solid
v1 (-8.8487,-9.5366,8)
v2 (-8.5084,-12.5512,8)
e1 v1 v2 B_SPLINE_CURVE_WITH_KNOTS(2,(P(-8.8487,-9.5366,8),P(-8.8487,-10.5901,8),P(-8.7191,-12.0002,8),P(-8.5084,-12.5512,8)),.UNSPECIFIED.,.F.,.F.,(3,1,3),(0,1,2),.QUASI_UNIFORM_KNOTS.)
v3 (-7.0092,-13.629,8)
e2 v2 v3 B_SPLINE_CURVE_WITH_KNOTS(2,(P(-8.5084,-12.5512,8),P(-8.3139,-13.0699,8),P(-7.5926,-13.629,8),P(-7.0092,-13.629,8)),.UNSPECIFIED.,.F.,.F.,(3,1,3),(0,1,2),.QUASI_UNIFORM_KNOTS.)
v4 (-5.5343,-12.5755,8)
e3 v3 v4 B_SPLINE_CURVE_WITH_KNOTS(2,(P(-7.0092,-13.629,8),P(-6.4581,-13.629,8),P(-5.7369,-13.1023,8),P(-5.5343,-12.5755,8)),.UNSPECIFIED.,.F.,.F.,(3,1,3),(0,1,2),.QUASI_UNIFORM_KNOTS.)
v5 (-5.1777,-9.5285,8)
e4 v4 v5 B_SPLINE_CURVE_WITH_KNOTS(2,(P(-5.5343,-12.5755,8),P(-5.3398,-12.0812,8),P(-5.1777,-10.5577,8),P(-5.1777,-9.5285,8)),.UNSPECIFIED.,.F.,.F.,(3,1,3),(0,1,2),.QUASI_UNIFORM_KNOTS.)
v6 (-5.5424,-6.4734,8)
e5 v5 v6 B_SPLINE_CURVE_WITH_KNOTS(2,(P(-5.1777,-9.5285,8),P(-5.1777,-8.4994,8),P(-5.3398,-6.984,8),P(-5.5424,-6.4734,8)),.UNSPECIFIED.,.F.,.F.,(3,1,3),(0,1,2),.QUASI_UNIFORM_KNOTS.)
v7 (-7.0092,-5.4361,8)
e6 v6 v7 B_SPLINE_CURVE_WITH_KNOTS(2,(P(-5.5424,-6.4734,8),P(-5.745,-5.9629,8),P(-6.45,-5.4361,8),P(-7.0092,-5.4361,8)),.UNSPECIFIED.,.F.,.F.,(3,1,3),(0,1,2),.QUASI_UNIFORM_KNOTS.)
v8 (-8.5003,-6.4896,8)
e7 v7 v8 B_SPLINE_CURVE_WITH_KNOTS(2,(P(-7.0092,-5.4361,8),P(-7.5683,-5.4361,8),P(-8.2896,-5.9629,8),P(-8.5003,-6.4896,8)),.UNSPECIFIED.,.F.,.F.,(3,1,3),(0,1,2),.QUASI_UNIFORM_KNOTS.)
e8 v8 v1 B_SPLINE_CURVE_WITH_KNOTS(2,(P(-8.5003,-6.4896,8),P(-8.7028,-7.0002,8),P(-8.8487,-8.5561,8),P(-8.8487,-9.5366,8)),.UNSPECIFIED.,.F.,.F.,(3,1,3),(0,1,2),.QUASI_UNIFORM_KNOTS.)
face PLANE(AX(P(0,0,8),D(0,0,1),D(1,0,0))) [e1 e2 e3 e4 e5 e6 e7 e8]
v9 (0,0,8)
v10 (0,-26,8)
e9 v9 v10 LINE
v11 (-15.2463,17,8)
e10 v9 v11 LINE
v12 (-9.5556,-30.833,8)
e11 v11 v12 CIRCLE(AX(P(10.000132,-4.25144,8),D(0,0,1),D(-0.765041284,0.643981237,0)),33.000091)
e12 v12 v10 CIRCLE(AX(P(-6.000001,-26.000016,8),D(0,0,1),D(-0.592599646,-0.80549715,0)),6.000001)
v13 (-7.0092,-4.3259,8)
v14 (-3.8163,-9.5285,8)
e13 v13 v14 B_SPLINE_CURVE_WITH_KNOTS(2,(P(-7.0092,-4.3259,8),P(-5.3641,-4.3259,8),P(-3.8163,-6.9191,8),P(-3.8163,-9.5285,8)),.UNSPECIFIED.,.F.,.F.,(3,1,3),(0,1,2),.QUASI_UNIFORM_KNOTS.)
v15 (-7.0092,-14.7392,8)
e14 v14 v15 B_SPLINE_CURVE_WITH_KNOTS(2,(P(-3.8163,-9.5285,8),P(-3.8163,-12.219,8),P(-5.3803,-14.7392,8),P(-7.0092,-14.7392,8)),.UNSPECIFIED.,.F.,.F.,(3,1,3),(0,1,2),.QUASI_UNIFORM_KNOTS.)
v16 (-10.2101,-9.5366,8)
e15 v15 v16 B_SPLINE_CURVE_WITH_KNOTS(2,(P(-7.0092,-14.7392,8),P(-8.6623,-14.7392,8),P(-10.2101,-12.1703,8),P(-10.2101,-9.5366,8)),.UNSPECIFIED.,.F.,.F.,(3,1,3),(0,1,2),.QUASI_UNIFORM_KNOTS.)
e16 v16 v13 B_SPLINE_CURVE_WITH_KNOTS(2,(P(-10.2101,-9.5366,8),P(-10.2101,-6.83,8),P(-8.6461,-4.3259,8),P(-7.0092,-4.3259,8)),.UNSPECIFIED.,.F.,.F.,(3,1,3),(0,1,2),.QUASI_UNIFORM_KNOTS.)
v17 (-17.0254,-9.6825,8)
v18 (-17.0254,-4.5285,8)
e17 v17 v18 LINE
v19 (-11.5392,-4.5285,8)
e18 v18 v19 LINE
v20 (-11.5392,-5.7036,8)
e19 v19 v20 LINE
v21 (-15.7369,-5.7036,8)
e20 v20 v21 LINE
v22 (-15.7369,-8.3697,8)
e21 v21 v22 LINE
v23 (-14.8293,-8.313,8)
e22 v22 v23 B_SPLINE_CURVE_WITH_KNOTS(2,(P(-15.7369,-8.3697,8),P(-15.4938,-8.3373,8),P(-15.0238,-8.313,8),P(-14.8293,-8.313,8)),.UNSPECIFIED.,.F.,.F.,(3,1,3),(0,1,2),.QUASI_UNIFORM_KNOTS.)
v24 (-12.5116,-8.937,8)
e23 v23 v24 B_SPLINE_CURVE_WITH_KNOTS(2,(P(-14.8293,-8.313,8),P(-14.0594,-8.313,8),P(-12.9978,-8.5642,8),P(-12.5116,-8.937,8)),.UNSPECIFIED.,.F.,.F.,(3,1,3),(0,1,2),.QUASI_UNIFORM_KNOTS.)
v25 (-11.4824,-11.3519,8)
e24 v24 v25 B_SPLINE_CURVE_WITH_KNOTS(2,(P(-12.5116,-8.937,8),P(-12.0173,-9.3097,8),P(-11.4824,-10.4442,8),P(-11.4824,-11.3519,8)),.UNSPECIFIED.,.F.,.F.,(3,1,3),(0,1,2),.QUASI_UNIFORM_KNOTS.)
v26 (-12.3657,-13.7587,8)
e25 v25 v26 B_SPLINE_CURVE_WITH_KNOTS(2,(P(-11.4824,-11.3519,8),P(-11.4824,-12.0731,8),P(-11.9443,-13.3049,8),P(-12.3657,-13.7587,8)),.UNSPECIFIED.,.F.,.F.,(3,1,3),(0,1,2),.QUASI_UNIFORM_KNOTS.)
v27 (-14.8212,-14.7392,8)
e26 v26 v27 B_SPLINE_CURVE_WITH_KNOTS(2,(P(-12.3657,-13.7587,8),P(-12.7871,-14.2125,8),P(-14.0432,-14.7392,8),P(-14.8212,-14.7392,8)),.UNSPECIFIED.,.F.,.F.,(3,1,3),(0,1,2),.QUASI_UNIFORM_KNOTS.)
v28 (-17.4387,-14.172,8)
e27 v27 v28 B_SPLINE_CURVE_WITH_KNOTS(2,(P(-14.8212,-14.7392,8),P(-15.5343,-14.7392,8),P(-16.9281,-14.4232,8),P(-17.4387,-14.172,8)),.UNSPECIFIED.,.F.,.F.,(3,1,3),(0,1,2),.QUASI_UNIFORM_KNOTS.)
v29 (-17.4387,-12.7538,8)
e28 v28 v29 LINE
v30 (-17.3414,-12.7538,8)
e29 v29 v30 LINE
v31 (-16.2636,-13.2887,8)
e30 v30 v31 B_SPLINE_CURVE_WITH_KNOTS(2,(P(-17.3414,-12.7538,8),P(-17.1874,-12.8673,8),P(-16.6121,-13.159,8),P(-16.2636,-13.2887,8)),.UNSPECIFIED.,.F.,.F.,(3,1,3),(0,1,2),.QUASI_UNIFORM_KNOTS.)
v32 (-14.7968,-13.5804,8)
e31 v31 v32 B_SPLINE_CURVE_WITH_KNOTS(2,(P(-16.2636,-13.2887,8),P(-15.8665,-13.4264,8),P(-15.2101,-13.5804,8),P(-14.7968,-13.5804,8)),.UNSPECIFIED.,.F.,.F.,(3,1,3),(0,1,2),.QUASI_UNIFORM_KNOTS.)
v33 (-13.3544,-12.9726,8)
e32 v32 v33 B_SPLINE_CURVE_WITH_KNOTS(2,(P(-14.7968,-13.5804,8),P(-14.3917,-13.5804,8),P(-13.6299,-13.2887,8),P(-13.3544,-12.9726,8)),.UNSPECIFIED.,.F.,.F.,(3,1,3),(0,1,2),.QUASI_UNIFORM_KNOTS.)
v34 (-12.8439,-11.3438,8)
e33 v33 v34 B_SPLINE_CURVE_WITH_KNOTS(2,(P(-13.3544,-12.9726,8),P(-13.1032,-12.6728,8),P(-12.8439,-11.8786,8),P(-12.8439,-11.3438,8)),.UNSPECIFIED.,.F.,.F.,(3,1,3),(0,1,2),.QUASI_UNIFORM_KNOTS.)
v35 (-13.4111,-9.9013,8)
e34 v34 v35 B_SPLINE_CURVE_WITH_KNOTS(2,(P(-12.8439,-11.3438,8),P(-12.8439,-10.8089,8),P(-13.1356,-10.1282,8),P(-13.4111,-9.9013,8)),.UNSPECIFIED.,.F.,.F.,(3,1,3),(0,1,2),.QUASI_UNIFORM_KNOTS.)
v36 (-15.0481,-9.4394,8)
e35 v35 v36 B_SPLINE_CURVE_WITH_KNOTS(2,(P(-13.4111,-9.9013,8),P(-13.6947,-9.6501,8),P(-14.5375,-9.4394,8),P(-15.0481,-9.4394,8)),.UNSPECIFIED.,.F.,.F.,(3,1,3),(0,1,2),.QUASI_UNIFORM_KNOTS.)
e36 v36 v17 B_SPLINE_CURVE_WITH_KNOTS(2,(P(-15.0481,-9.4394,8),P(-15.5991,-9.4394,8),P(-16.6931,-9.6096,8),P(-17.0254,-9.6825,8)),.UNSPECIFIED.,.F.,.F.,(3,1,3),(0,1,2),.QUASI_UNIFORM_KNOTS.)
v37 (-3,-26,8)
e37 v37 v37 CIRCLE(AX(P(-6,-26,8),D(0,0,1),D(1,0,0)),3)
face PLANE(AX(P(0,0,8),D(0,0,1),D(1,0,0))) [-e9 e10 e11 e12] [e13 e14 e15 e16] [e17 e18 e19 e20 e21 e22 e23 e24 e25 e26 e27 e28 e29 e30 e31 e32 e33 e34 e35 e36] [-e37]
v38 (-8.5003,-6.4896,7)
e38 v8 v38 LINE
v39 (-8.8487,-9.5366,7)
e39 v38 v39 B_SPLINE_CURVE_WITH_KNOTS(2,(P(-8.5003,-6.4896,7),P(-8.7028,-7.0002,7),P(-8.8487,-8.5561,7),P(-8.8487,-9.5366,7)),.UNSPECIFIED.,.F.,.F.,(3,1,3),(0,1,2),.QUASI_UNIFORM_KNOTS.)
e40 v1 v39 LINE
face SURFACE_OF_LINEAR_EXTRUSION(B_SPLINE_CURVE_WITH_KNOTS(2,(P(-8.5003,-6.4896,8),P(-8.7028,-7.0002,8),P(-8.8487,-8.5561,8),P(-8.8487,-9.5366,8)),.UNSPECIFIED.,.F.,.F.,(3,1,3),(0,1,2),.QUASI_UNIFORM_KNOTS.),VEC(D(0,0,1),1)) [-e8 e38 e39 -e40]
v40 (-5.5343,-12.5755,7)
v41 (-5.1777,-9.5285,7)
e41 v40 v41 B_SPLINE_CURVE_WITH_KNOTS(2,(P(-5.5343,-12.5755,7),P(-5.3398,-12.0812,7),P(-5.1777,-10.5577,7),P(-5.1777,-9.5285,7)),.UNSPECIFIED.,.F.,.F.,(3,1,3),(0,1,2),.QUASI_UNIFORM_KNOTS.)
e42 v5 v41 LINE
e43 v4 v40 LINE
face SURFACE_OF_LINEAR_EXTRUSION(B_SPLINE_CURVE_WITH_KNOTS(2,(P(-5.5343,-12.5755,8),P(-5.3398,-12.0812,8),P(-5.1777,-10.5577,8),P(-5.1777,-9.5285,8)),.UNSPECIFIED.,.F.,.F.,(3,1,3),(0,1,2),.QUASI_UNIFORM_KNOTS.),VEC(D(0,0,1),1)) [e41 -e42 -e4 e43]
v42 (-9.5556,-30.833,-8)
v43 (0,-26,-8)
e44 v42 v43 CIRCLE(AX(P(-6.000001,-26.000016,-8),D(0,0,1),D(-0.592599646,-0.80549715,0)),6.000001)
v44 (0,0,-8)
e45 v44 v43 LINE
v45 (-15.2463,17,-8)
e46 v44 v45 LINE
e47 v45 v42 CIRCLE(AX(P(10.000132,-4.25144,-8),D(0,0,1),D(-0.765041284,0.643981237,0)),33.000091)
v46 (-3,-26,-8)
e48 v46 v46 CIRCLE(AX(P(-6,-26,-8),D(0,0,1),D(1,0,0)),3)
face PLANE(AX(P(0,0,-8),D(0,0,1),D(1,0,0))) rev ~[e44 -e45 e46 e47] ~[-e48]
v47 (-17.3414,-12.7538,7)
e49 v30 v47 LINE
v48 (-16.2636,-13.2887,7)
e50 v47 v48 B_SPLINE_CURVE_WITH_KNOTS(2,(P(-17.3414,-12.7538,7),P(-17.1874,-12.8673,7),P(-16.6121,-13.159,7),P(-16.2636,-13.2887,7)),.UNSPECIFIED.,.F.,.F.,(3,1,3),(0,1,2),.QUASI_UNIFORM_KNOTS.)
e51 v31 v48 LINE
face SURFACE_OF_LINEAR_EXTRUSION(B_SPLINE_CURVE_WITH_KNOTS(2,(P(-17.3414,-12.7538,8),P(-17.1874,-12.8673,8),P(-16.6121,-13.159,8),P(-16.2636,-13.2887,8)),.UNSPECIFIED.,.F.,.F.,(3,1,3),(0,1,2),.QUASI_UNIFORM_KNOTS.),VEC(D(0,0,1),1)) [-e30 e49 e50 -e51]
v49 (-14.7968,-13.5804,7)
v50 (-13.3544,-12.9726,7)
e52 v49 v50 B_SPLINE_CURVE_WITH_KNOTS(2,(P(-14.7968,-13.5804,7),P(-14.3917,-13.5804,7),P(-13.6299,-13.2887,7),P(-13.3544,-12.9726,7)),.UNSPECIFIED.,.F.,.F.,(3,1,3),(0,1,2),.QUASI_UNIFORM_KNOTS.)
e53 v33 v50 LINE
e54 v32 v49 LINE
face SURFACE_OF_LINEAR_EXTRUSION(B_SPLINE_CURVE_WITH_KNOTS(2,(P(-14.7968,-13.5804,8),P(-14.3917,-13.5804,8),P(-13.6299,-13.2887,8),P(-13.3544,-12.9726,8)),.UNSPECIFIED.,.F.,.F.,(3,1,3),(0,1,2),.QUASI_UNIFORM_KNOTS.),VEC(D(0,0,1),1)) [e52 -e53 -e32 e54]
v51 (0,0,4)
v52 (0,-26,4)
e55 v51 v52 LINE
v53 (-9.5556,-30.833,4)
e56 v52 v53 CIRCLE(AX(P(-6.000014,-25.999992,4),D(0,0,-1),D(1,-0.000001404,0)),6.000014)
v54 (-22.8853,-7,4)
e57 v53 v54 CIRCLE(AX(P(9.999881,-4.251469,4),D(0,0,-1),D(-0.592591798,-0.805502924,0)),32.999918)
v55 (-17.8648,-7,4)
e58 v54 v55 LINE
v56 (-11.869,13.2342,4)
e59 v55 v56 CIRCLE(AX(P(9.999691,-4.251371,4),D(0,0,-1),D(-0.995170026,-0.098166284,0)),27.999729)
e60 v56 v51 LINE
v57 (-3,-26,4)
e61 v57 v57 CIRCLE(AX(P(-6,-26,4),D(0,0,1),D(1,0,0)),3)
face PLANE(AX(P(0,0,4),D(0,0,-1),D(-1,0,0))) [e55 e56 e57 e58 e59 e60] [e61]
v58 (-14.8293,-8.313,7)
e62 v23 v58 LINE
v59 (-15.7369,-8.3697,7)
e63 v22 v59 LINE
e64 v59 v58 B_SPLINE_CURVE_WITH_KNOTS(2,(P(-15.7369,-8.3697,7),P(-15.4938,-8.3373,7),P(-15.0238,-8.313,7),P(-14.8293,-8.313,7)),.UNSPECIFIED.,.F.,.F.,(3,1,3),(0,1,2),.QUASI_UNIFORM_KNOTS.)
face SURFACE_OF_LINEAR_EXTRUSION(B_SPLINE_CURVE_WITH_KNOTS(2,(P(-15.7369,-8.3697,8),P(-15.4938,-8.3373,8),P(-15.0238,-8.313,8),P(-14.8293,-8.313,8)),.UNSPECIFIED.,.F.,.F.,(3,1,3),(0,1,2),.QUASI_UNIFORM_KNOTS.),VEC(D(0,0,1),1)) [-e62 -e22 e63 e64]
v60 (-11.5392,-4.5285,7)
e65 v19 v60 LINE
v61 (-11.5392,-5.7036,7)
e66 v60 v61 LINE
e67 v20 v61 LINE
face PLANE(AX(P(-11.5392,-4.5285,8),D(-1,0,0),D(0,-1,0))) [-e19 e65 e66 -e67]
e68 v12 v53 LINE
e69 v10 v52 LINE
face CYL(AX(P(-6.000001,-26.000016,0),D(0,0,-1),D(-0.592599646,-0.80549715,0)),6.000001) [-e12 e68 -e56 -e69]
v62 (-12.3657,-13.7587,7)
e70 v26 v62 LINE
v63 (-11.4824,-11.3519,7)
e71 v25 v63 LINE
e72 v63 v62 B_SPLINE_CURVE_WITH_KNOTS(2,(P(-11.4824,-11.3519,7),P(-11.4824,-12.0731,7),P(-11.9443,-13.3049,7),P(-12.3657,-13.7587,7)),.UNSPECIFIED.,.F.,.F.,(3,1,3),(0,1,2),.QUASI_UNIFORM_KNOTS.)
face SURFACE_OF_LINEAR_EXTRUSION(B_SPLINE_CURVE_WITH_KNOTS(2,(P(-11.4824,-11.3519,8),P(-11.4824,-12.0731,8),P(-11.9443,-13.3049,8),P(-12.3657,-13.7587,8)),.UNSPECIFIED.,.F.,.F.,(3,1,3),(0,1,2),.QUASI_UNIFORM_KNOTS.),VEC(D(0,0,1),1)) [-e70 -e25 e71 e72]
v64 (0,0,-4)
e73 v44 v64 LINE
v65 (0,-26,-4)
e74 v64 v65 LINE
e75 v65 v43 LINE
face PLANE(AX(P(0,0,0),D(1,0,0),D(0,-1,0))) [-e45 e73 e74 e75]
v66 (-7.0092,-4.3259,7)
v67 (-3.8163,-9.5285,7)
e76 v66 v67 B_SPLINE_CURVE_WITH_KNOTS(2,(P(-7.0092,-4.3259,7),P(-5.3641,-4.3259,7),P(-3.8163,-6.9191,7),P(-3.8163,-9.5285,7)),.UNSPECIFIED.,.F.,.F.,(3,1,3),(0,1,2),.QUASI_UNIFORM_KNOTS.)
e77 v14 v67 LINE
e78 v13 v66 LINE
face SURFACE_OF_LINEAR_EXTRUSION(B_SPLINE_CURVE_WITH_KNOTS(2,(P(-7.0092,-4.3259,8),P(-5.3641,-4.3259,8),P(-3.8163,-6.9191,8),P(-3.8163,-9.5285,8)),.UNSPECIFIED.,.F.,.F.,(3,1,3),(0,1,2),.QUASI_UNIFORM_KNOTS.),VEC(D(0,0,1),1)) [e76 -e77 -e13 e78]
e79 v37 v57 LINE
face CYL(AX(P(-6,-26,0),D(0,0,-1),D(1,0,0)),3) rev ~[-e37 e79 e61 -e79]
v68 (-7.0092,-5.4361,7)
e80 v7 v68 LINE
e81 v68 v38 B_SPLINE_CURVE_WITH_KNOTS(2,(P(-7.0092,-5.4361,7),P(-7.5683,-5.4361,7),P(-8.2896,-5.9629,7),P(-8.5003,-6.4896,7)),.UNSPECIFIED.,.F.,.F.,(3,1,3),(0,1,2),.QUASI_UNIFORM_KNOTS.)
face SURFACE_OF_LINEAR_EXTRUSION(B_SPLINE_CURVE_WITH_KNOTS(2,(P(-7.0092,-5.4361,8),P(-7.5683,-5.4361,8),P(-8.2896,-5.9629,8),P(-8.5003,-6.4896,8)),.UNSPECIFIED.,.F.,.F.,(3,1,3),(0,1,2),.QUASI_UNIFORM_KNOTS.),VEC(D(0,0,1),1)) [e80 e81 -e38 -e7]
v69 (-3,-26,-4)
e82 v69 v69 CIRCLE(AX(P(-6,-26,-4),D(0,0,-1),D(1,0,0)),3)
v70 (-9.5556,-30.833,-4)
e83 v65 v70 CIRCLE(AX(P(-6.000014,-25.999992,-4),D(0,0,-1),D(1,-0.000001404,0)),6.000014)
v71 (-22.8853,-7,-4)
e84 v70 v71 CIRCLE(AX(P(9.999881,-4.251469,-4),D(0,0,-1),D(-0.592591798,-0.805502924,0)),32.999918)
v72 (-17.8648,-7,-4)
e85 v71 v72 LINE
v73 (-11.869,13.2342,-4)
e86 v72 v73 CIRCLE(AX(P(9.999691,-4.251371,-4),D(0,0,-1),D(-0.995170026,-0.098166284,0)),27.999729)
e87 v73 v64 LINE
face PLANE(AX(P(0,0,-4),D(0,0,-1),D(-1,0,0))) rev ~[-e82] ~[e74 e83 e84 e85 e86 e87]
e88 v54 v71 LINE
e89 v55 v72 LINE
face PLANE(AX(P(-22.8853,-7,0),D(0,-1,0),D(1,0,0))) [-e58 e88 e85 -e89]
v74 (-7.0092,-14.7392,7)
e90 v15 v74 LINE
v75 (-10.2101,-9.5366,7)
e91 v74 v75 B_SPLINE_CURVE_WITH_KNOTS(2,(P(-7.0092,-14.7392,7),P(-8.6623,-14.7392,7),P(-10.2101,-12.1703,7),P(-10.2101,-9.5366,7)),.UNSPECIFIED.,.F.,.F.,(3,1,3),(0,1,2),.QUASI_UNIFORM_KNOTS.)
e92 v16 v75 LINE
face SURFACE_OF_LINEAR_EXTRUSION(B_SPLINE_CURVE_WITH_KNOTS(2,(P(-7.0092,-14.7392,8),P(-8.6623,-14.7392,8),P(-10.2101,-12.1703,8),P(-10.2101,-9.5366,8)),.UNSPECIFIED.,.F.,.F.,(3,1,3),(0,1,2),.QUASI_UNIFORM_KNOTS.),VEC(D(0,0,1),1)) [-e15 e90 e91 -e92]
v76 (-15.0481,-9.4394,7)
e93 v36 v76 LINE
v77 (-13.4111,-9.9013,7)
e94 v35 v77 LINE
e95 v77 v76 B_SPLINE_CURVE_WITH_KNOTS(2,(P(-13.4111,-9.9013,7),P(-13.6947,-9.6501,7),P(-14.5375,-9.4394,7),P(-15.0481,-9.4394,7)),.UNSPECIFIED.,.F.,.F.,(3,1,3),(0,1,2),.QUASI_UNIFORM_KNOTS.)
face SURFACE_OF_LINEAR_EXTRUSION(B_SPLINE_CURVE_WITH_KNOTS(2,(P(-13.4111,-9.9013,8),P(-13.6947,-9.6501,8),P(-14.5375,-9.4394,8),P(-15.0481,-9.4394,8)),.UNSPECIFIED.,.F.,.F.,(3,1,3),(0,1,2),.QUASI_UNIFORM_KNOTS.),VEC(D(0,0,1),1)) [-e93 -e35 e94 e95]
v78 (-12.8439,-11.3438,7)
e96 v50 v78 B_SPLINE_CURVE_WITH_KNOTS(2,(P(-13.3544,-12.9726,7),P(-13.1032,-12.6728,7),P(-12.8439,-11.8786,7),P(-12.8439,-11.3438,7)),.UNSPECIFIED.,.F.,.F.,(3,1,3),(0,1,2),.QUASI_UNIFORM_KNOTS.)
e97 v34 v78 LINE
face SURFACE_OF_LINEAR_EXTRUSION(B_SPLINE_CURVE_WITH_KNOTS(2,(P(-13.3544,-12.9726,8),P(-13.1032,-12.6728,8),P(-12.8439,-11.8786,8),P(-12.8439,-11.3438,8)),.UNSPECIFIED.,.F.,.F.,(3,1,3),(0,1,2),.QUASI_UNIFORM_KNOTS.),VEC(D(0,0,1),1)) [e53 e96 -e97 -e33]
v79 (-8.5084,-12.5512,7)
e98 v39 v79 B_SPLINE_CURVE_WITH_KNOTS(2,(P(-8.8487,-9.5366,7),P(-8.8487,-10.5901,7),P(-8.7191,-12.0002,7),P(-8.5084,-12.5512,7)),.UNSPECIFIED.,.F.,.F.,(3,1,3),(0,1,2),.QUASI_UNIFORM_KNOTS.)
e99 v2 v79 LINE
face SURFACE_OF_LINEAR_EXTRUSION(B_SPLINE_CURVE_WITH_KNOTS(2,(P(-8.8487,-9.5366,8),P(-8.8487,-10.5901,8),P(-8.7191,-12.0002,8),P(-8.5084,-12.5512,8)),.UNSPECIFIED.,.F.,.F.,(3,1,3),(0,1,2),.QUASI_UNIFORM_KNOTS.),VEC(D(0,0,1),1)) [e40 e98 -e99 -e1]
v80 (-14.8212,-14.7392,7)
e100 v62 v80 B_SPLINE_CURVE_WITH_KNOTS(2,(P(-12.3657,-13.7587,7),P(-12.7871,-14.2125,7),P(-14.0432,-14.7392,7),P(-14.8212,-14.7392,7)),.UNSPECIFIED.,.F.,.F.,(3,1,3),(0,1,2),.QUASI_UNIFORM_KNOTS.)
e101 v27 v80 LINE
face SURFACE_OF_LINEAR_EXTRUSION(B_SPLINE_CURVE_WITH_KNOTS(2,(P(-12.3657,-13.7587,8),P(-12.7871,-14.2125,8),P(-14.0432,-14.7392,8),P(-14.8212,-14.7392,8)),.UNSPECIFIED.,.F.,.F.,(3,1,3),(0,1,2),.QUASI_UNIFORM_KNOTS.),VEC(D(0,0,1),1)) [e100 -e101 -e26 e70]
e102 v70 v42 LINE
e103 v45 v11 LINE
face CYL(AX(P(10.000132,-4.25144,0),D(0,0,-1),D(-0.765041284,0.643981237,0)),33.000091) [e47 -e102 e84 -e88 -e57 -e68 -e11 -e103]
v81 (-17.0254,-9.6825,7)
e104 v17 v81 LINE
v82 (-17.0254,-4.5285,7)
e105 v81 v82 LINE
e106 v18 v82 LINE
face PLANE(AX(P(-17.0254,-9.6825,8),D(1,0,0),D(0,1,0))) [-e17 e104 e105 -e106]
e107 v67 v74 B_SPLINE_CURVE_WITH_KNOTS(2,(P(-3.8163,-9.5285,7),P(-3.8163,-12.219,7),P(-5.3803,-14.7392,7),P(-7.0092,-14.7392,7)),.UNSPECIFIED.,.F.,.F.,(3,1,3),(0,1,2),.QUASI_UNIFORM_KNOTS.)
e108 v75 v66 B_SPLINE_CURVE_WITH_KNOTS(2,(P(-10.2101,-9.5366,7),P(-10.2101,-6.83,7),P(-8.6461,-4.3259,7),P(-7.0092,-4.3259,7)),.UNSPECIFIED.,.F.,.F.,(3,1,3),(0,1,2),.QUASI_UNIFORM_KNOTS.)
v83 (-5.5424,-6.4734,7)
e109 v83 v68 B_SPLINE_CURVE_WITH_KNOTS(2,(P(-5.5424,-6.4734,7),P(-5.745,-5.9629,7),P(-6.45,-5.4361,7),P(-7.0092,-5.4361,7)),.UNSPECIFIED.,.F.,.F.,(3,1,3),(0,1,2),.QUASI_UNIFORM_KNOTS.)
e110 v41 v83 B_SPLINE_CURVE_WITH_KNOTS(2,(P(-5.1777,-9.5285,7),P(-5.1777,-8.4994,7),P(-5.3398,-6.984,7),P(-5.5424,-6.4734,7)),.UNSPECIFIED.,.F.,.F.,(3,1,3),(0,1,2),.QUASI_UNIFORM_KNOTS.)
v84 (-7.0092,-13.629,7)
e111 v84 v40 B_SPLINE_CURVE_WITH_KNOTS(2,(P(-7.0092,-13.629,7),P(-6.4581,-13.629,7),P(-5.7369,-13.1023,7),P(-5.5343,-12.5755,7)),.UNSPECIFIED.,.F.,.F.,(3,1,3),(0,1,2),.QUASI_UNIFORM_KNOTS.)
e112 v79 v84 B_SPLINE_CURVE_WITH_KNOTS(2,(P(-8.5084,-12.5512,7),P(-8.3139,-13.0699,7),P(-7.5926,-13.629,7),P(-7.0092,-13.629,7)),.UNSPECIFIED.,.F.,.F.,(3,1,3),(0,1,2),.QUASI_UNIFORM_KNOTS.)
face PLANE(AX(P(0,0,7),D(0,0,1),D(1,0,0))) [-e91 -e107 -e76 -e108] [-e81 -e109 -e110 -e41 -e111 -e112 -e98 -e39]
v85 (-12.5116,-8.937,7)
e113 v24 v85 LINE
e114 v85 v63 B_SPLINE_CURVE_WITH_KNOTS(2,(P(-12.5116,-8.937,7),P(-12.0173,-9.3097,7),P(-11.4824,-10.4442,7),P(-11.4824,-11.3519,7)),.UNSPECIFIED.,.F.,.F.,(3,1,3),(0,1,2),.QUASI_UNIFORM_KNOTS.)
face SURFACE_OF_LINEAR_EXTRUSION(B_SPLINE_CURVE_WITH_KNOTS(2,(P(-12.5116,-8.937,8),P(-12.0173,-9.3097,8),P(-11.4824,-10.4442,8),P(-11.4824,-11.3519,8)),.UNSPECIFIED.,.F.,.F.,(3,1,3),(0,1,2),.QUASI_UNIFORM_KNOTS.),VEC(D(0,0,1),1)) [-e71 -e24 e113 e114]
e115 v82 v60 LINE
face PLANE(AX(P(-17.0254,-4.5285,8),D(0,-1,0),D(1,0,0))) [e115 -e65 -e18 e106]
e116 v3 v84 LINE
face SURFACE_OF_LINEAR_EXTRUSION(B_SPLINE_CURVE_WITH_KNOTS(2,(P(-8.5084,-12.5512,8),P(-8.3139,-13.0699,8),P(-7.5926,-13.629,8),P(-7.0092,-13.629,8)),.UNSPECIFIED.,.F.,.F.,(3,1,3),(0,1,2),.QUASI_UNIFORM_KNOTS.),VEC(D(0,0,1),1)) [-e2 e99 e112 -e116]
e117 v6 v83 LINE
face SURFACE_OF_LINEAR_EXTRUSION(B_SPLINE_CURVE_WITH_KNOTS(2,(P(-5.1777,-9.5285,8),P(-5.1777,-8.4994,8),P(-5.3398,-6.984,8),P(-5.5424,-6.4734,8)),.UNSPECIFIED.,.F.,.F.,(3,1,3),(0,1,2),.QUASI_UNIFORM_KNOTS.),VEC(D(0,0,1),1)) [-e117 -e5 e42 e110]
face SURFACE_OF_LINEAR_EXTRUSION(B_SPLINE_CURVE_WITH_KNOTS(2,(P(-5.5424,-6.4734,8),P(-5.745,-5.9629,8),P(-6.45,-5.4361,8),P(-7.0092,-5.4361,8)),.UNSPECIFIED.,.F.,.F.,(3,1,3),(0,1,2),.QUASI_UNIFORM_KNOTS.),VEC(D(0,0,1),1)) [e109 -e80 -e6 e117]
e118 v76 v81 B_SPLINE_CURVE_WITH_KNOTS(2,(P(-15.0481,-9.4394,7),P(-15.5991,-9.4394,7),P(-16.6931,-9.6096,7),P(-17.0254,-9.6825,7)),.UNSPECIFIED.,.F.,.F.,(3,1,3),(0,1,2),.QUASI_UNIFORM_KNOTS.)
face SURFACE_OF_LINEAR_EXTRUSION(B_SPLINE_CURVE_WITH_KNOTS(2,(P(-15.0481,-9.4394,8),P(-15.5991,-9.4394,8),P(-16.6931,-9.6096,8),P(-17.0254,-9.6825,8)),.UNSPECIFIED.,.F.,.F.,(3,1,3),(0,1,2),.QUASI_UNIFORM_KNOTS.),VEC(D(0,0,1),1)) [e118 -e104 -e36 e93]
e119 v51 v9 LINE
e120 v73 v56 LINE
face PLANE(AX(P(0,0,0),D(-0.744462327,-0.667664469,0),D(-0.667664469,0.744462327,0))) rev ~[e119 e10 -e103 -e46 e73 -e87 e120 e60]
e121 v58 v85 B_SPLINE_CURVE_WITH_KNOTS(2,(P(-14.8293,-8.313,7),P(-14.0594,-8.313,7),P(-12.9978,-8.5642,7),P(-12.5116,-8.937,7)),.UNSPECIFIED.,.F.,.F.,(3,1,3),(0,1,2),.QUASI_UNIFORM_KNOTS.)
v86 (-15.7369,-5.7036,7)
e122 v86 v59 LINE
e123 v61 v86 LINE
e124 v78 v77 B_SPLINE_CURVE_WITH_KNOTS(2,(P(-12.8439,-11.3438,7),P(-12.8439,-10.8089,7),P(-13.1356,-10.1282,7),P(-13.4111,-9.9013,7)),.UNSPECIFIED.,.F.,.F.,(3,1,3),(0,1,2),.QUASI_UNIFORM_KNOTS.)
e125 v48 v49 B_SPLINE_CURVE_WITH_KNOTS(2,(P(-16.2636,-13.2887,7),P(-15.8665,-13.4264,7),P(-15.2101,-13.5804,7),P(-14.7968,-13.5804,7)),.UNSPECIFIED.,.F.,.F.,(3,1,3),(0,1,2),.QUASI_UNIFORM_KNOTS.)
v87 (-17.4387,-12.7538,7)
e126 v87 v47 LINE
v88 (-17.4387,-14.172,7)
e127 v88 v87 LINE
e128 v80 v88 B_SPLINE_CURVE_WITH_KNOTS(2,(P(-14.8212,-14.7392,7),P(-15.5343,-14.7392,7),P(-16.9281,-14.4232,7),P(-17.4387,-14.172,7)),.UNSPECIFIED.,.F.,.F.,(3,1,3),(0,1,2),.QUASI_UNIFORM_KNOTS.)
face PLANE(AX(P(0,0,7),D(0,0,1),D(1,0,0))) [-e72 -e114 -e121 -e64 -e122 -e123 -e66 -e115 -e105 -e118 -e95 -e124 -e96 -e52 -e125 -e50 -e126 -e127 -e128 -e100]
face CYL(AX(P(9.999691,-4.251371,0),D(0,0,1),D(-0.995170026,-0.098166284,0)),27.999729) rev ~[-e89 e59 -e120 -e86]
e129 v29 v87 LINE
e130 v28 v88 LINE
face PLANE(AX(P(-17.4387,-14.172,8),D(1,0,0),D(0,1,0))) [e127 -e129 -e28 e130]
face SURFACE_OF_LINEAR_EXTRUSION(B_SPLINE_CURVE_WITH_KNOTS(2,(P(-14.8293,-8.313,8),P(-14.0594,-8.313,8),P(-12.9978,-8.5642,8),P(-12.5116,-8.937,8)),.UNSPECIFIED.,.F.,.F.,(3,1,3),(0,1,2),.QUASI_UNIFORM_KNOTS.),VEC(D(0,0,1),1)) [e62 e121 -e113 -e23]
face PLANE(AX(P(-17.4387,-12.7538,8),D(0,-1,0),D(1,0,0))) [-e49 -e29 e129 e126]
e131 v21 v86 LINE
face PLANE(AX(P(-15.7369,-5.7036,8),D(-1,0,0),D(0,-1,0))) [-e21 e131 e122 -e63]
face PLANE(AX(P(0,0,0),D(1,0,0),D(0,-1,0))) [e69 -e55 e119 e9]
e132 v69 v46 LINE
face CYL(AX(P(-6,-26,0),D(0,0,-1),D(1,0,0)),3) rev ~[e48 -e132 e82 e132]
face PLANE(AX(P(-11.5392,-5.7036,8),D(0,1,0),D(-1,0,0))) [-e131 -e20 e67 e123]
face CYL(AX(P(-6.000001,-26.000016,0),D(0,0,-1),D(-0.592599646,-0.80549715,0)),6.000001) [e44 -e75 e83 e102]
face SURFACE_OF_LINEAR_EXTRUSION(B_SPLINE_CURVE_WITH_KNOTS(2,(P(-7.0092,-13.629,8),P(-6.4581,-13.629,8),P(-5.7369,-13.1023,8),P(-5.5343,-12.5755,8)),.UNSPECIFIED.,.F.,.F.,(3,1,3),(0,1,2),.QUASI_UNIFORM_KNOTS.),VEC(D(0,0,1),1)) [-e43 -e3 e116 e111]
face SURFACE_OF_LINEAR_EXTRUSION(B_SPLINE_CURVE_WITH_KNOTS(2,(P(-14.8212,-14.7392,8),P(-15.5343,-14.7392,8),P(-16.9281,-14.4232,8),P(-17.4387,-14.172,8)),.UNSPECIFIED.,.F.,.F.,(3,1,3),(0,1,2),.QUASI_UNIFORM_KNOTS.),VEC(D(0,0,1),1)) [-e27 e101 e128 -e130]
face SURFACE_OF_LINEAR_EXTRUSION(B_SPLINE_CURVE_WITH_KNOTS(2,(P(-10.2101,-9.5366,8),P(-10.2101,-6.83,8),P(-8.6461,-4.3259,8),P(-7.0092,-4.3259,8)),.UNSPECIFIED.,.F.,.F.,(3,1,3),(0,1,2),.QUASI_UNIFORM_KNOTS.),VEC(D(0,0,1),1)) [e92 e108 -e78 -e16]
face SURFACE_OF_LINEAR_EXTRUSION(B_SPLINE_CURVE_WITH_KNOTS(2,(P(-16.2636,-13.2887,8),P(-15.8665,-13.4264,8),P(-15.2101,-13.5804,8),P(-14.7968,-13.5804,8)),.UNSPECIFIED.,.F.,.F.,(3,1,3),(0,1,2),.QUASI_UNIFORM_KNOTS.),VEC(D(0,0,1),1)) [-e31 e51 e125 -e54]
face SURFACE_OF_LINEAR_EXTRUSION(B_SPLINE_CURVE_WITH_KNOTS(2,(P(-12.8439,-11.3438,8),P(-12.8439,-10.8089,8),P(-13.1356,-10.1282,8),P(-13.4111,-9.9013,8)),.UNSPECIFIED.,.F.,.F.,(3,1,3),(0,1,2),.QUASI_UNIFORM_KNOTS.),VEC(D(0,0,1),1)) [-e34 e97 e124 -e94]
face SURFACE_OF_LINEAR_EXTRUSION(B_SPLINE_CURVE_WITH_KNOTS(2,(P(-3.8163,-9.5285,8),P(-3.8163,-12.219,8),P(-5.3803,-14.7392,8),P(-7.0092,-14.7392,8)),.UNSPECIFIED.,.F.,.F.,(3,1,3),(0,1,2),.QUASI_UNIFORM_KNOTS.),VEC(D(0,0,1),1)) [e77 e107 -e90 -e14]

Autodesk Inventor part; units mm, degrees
ref_plane "YZ Plane" through (0, 0, 0) normal (1, 0, 0) x (0, 1, 0)
ref_plane "XZ Plane" through (0, 0, 0) normal (0, 1, 0) x (-1, 0, 0)
sketch "스케치1" plane through (0, 0, 0) normal (0, 0, 1) x (1, 0, 0)
  line L0 (0, 0) -> (0, -26)
  line L1 (0, 0) -> (26, 0) construction
  arc A0 (-9.5556, -30.833) -> (0, -26) centre (-6, -26) ccw
  line L2 (0, 0) -> (-15.2463, 17)
  arc A1 (-15.2463, 17) -> (-9.5556, -30.833) centre (10, -4.2514) ccw
  circle A2 centre (-6, -26) radius 3
  dimension "d1" = 26
  dimension "d3" = 26
  dimension "d5" = 43
  dimension "d6" = 23
  dimension "d7" = 33
  dimension "d8" = 6
  dimension "d9" = 6
extrude "돌출1" add sketch "스케치1" along normal mid plane 16
ref_plane "작업 평면1" through (0, 0, 0) normal (0, 0, -1) x (-1, 0, 0)
sketch "스케치2" plane through (0, 0, 0) normal (0, 0, -1) x (-1, 0, 0)
  arc A0 (9.5556, -30.833) -> (15.2463, 17) centre (-10, -4.2514) ccw projected
  line L0 (22.8853, -7) -> (17.8648, -7)
  line L1 (0, 0) -> (0, -26) projected
  circle A1 centre (6, -26) radius 3 projected
  arc A2 (17.8648, -7) -> (11.869, 13.2342) centre (-10, -4.2514) ccw
  line L2 (15.2463, 17) -> (0, 0) projected
  arc A3 (0, -26) -> (9.5556, -30.833) centre (6, -26) ccw projected
  dimension "d14" = 19
extrude "돌출2" cut sketch "스케치2" along normal mid plane 8 contours A3 L1 L2 A2 L0 A0
sketch "스케치6" plane through (0, 0, 8) normal (0, 0, 1) x (1, 0, 0)
  line L0 (-18.2733, -4.3259) -> (-3.2652, -4.3259) construction
  line L1 (-3.2652, -4.3259) -> (-3.2652, -14.7392) construction
  line L2 (-3.2652, -14.7392) -> (-18.2733, -14.7392) construction
  line L3 (-18.2733, -14.7392) -> (-18.2733, -4.3259) construction
  spline S0 degree 2 poles (-11.4824, -11.3519) (-11.4824, -12.0731) (-11.9443, -13.3049) (-12.3657, -13.7587) knots 0 0 0 1 2 2 2
  spline S1 degree 2 poles (-12.3657, -13.7587) (-12.7871, -14.2125) (-14.0432, -14.7392) (-14.8212, -14.7392) knots 0 0 0 1 2 2 2
  spline S2 degree 2 poles (-14.8212, -14.7392) (-15.5343, -14.7392) (-16.9281, -14.4232) (-17.4387, -14.172) knots 0 0 0 1 2 2 2
  line L4 (-17.4387, -14.172) -> (-17.4387, -12.7538)
  line L5 (-17.4387, -12.7538) -> (-17.3414, -12.7538)
  spline S3 degree 2 poles (-17.3414, -12.7538) (-17.1874, -12.8673) (-16.6121, -13.159) (-16.2636, -13.2887) knots 0 0 0 1 2 2 2
  spline S4 degree 2 poles (-16.2636, -13.2887) (-15.8665, -13.4264) (-15.2101, -13.5804) (-14.7968, -13.5804) knots 0 0 0 1 2 2 2
  spline S5 degree 2 poles (-14.7968, -13.5804) (-14.3917, -13.5804) (-13.6299, -13.2887) (-13.3544, -12.9726) knots 0 0 0 1 2 2 2
  spline S6 degree 2 poles (-13.3544, -12.9726) (-13.1032, -12.6728) (-12.8439, -11.8786) (-12.8439, -11.3438) knots 0 0 0 1 2 2 2
  spline S7 degree 2 poles (-12.8439, -11.3438) (-12.8439, -10.8089) (-13.1356, -10.1282) (-13.4111, -9.9013) knots 0 0 0 1 2 2 2
  spline S8 degree 2 poles (-13.4111, -9.9013) (-13.6947, -9.6501) (-14.5375, -9.4394) (-15.0481, -9.4394) knots 0 0 0 1 2 2 2
  spline S9 degree 2 poles (-15.0481, -9.4394) (-15.5991, -9.4394) (-16.6931, -9.6096) (-17.0254, -9.6825) knots 0 0 0 1 2 2 2
  line L6 (-17.0254, -9.6825) -> (-17.0254, -4.5285)
  line L7 (-17.0254, -4.5285) -> (-11.5392, -4.5285)
  line L8 (-11.5392, -4.5285) -> (-11.5392, -5.7036)
  line L9 (-11.5392, -5.7036) -> (-15.7369, -5.7036)
  line L10 (-15.7369, -5.7036) -> (-15.7369, -8.3697)
  spline S10 degree 2 poles (-15.7369, -8.3697) (-15.4938, -8.3373) (-15.0238, -8.313) (-14.8293, -8.313) knots 0 0 0 1 2 2 2
  spline S11 degree 2 poles (-14.8293, -8.313) (-14.0594, -8.313) (-12.9978, -8.5642) (-12.5116, -8.937) knots 0 0 0 1 2 2 2
  spline S12 degree 2 poles (-12.5116, -8.937) (-12.0173, -9.3097) (-11.4824, -10.4442) (-11.4824, -11.3519) knots 0 0 0 1 2 2 2
  spline S13 degree 2 poles (-3.8163, -9.5285) (-3.8163, -12.219) (-5.3803, -14.7392) (-7.0092, -14.7392) knots 0 0 0 1 2 2 2
  spline S14 degree 2 poles (-7.0092, -14.7392) (-8.6623, -14.7392) (-10.2101, -12.1703) (-10.2101, -9.5366) knots 0 0 0 1 2 2 2
  spline S15 degree 2 poles (-10.2101, -9.5366) (-10.2101, -6.83) (-8.6461, -4.3259) (-7.0092, -4.3259) knots 0 0 0 1 2 2 2
  spline S16 degree 2 poles (-7.0092, -4.3259) (-5.3641, -4.3259) (-3.8163, -6.9191) (-3.8163, -9.5285) knots 0 0 0 1 2 2 2
  spline S17 degree 2 poles (-5.5343, -12.5755) (-5.3398, -12.0812) (-5.1777, -10.5577) (-5.1777, -9.5285) knots 0 0 0 1 2 2 2
  spline S18 degree 2 poles (-5.1777, -9.5285) (-5.1777, -8.4994) (-5.3398, -6.984) (-5.5424, -6.4734) knots 0 0 0 1 2 2 2
  spline S19 degree 2 poles (-5.5424, -6.4734) (-5.745, -5.9629) (-6.45, -5.4361) (-7.0092, -5.4361) knots 0 0 0 1 2 2 2
  spline S20 degree 2 poles (-7.0092, -5.4361) (-7.5683, -5.4361) (-8.2896, -5.9629) (-8.5003, -6.4896) knots 0 0 0 1 2 2 2
  spline S21 degree 2 poles (-8.5003, -6.4896) (-8.7028, -7.0002) (-8.8487, -8.5561) (-8.8487, -9.5366) knots 0 0 0 1 2 2 2
  spline S22 degree 2 poles (-8.8487, -9.5366) (-8.8487, -10.5901) (-8.7191, -12.0002) (-8.5084, -12.5512) knots 0 0 0 1 2 2 2
  spline S23 degree 2 poles (-8.5084, -12.5512) (-8.3139, -13.0699) (-7.5926, -13.629) (-7.0092, -13.629) knots 0 0 0 1 2 2 2
  spline S24 degree 2 poles (-7.0092, -13.629) (-6.4581, -13.629) (-5.7369, -13.1023) (-5.5343, -12.5755) knots 0 0 0 1 2 2 2
  point P0 (0, 0)
extrude "돌출3" cut sketch "스케치6" against normal blind 1
properties part number "05-1"
